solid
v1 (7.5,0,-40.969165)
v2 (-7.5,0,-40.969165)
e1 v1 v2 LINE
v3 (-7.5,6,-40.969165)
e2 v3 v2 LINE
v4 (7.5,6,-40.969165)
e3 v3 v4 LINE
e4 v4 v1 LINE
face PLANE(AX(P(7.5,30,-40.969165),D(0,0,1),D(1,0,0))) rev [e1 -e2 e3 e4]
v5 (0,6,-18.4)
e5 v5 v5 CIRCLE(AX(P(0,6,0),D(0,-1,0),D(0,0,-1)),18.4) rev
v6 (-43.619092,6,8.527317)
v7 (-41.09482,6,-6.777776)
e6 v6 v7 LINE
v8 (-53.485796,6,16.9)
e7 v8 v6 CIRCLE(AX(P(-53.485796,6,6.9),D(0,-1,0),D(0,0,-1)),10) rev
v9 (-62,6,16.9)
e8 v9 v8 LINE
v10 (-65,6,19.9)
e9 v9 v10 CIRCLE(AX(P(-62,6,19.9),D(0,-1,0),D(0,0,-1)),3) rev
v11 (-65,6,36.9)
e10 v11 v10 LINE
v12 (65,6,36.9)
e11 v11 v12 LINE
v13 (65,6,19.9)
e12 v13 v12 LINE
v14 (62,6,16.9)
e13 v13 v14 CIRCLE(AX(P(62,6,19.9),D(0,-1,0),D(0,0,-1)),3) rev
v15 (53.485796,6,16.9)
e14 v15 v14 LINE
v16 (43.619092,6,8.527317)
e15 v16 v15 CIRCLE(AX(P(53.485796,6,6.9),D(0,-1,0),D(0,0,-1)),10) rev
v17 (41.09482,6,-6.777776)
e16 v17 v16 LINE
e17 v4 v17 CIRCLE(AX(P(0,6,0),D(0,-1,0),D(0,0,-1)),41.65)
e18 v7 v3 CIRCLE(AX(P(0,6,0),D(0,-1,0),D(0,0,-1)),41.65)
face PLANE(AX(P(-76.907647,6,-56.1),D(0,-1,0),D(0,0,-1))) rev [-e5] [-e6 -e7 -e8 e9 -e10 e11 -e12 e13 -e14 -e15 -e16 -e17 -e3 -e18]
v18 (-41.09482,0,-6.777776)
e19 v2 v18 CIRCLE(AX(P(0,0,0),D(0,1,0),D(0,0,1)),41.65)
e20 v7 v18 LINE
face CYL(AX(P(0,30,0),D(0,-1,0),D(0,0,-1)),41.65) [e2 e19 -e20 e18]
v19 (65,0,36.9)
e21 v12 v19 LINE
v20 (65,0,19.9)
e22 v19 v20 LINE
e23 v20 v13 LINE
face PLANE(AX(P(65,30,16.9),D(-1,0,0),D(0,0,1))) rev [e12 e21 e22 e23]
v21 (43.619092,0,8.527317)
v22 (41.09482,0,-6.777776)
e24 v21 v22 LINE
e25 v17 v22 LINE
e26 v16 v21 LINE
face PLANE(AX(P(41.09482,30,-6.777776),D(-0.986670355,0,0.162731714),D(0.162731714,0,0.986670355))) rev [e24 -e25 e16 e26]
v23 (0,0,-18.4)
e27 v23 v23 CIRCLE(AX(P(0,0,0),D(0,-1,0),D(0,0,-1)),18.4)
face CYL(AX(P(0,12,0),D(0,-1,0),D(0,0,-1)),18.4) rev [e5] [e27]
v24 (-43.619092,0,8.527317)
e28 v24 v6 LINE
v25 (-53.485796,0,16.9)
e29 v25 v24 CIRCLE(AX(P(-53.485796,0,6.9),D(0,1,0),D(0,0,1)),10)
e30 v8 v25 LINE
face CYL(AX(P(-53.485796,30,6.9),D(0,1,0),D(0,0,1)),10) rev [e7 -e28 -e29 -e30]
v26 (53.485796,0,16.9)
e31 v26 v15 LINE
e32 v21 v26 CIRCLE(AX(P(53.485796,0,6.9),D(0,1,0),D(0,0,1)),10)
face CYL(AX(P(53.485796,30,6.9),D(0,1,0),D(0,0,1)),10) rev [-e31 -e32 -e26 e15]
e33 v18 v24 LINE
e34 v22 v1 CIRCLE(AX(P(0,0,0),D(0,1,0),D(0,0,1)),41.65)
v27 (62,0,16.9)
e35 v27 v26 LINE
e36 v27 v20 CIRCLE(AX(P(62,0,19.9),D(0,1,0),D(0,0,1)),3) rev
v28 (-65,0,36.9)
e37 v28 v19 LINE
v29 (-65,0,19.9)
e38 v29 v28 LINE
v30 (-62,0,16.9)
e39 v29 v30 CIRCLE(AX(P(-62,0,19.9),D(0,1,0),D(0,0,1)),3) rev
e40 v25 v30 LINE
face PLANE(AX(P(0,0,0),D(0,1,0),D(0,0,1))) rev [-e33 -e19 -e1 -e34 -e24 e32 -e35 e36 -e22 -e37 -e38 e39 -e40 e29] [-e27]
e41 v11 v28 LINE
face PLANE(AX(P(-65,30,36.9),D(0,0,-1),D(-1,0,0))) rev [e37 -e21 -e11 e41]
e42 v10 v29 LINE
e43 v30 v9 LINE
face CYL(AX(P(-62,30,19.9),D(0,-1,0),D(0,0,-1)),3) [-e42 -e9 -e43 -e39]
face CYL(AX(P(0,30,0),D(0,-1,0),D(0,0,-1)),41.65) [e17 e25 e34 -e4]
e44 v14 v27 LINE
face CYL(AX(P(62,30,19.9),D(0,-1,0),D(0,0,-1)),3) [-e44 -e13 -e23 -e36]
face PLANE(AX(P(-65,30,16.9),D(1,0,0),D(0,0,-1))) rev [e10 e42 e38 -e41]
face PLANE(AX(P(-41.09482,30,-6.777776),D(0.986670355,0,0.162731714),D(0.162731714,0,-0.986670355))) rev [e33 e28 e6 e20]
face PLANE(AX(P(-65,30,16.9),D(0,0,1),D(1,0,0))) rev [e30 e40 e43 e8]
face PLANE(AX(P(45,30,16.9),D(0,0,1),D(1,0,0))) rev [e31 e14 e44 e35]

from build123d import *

# Parameters (mm, degrees)
SKETCH1_R           = 20.9
BOSS_EXTRUDE1_DEPTH = 30
SKETCH2_R           = 1
CUT_EXTRUDE1_DEPTH  = 3
SKETCH3_R           = 1
CUT_EXTRUDE2_DEPTH  = 3
SKETCH6_R           = 22.9
SKETCH6_R_2         = 18.4
BOSS_EXTRUDE2_DEPTH = 12
FILLET1_R           = 10
CHAMFER1_SIZE       = 2
SKETCH4_W           = 15
SKETCH4_H           = 3.988700157
CUT_EXTRUDE3_DEPTH  = 83.82344173
SKETCH8_R           = 1
CUT_EXTRUDE4_DEPTH  = 2
FILLET2_R           = 3
FILLET3_R           = 3
SKETCH9_W           = 164.009429166
SKETCH9_H           = 28.275732928
CUT_EXTRUDE5_DEPTH  = 93


with BuildPart() as part:
    # Sketch1 → Boss-Extrude1 (new body)
    with BuildSketch(Plane(origin=(0, 0, 0), x_dir=(1, 0, 0), z_dir=(0, 1, 0))):
        with BuildLine():
            Line((-41.094820281, 6.777775896), (-45, -16.9))
            Line((-45, -16.9), (-65, -16.9))
            Line((-65, -16.9), (-65, -36.9))
            Line((-65, -36.9), (65, -36.9))
            Line((65, -36.9), (65, -16.9))
            Line((65, -16.9), (45, -16.9))
            Line((45, -16.9), (41.094820281, 6.777775896))
            ThreePointArc((41.094820281, 6.777775896), (0, 41.65), (-41.094820281, 6.777775896))
        make_face()
        with Locations(Location((0, 0, 0), (0, 0, 270))):
            Circle(SKETCH1_R, mode=Mode.SUBTRACT)
    extrude(amount=BOSS_EXTRUDE1_DEPTH)

    # Sketch2 → Cut-Extrude1 (cut)
    with BuildSketch(Plane(origin=(0, 0, 16.9), x_dir=(-1, 0, 0), z_dir=(0, 0, -1))):
        with Locations((-55, 15)):
            Circle(SKETCH2_R)
    extrude(amount=-CUT_EXTRUDE1_DEPTH, mode=Mode.SUBTRACT)

    # Sketch3 → Cut-Extrude2 (cut)
    with BuildSketch(Plane(origin=(0, 0, 16.9), x_dir=(-1, 0, 0), z_dir=(0, 0, -1))):
        with Locations((55, 15)):
            Circle(SKETCH3_R)
    extrude(amount=-CUT_EXTRUDE2_DEPTH, mode=Mode.SUBTRACT)

    # Sketch6 → Boss-Extrude2 (add)
    with BuildSketch(Plane.XZ):
        Circle(SKETCH6_R)
        with Locations(Location((0, 0, 0), (0, 0, 270))):
            Circle(SKETCH6_R_2, mode=Mode.SUBTRACT)
    extrude(amount=-BOSS_EXTRUDE2_DEPTH)

    # Fillet1
    fillet1_edges = [part.edges().sort_by_distance(p)[0] for p in [
        (-45, 15, 16.9),
        (45, 15, 16.9),
    ]]
    fillet(fillet1_edges, radius=FILLET1_R)

    # Chamfer1
    chamfer1_edges = [part.edges().sort_by_distance(p)[0] for p in [
        (0, 30, -20.9),
    ]]
    chamfer(chamfer1_edges, length=CHAMFER1_SIZE)

    # Sketch4 → Cut-Extrude3 (cut, through all)
    with BuildSketch(Plane.XZ):
        with Locations((0, -42.963515313)):
            Rectangle(SKETCH4_W, SKETCH4_H)
    extrude(amount=-CUT_EXTRUDE3_DEPTH, mode=Mode.SUBTRACT)

    # Sketch8 → Cut-Extrude4 (cut)
    with BuildSketch(Plane(origin=(0, 0, -40.969165234), x_dir=(-1, 0, 0), z_dir=(0, 0, -1))):
        with Locations((0, 22)):
            Circle(SKETCH8_R)
    extrude(amount=-CUT_EXTRUDE4_DEPTH, mode=Mode.SUBTRACT)

    # Fillet2
    # the kernel refuses this fillet: 3 mm, written as the material it takes off along each edge
    with BuildSketch(Plane(origin=(83, 30, 16.9), x_dir=(0, 0, 1), z_dir=(-1, 0, 0)), Plane(origin=(-53.485795501, 30, 16.9), x_dir=(0, 0, 1), z_dir=(-1, 0, 0))) as fillet2_piece_1:
        with BuildLine():
            CenterArc((FILLET2_R, -FILLET2_R), FILLET2_R, 90, 90)
            Line((0, -FILLET2_R), (-FILLET2_R * 0.02, -FILLET2_R))
            Line((-FILLET2_R * 0.02, -FILLET2_R), (-FILLET2_R * 0.02, FILLET2_R * 0.02))
            Line((-FILLET2_R * 0.02, FILLET2_R * 0.02), (FILLET2_R, FILLET2_R * 0.02))
            Line((FILLET2_R, FILLET2_R * 0.02), (FILLET2_R, 0))
        make_face()
    extrude(amount=29.514204499, mode=Mode.SUBTRACT)
    with BuildSketch(Plane(origin=(53.485795501, 30, 6.9), x_dir=(-0.9866703548806417, 0, 0.1627317141792235), z_dir=(-0.1627317141792235, 0, -0.9866703548806417))) as fillet2_piece_2:
        with BuildLine():
            CenterArc((10 + FILLET2_R, -FILLET2_R), FILLET2_R, 90, 90)
            Line((10, -FILLET2_R), (10 - FILLET2_R * 0.02, -FILLET2_R))
            Line((10 - FILLET2_R * 0.02, -FILLET2_R), (10 - FILLET2_R * 0.02, FILLET2_R * 0.02))
            Line((10 - FILLET2_R * 0.02, FILLET2_R * 0.02), (10 + FILLET2_R, FILLET2_R * 0.02))
            Line((10 + FILLET2_R, FILLET2_R * 0.02), (10 + FILLET2_R, 0))
        make_face()
    revolve(axis=Axis((53.485795501, 30, 6.9), (0, 1, 0)), revolution_arc=80.6345096, mode=Mode.SUBTRACT)
    with BuildSketch(Plane(origin=(43.619091952, 30, 8.527317142), x_dir=(-0.9866703548806418, 0, 0.16273171417922358), z_dir=(-0.16273171417922358, 0, -0.9866703548806418)), Plane(origin=(-41.094820281, 30, -6.777775896), x_dir=(0.9866703548806418, 0, 0.16273171417922358), z_dir=(-0.16273171417922358, 0, 0.9866703548806418))) as fillet2_piece_3:
        with BuildLine():
            CenterArc((FILLET2_R, -FILLET2_R), FILLET2_R, 90, 90)
            Line((0, -FILLET2_R), (-FILLET2_R * 0.02, -FILLET2_R))
            Line((-FILLET2_R * 0.02, -FILLET2_R), (-FILLET2_R * 0.02, FILLET2_R * 0.02))
            Line((-FILLET2_R * 0.02, FILLET2_R * 0.02), (FILLET2_R, FILLET2_R * 0.02))
            Line((FILLET2_R, FILLET2_R * 0.02), (FILLET2_R, 0))
        make_face()
    extrude(amount=15.511860635, mode=Mode.SUBTRACT)
    with BuildSketch(Plane(origin=(-53.485795501, 30, 6.9), x_dir=(0.9866703548806417, 0, 0.1627317141792235), z_dir=(0.1627317141792235, 0, -0.9866703548806417))) as fillet2_piece_4:
        with BuildLine():
            CenterArc((10 + FILLET2_R, FILLET2_R), FILLET2_R, 180, 90)
            Line((10, FILLET2_R), (10 - FILLET2_R * 0.02, FILLET2_R))
            Line((10 - FILLET2_R * 0.02, FILLET2_R), (10 - FILLET2_R * 0.02, -FILLET2_R * 0.02))
            Line((10 - FILLET2_R * 0.02, -FILLET2_R * 0.02), (10 + FILLET2_R, -FILLET2_R * 0.02))
            Line((10 + FILLET2_R, -FILLET2_R * 0.02), (10 + FILLET2_R, 0))
        make_face()
    revolve(axis=Axis((-53.485795501, 30, 6.9), (0, -1, 0)), revolution_arc=80.6345096, mode=Mode.SUBTRACT)
    with BuildSketch(Plane(origin=(0, 30, 0), x_dir=(0.24858486581871286, 0, -0.9686101199584343), z_dir=(0.9686101199584343, 0, 0.24858486581871286))) as fillet2_piece_5:
        with BuildLine():
            CenterArc((41.65 - FILLET2_R, -FILLET2_R), FILLET2_R, 0, 90)
            Line((41.65, -FILLET2_R), (41.65 + FILLET2_R * 0.02, -FILLET2_R))
            Line((41.65 + FILLET2_R * 0.02, -FILLET2_R), (41.65 + FILLET2_R * 0.02, FILLET2_R * 0.02))
            Line((41.65 + FILLET2_R * 0.02, FILLET2_R * 0.02), (41.65 - FILLET2_R, FILLET2_R * 0.02))
            Line((41.65 - FILLET2_R, FILLET2_R * 0.02), (41.65 - FILLET2_R, 0))
        make_face()
    revolve(axis=Axis((0, 30, 0), (0, 1, 0)), revolution_arc=95.028297231, mode=Mode.SUBTRACT)
    with BuildSketch(Plane(origin=(0, 30, 0), x_dir=(0.9866703548806417, 0, -0.16273171417922386), z_dir=(0.16273171417922386, 0, 0.9866703548806417))) as fillet2_piece_6:
        with BuildLine():
            CenterArc((41.65 - FILLET2_R, -FILLET2_R), FILLET2_R, 0, 90)
            Line((41.65, -FILLET2_R), (41.65 + FILLET2_R * 0.02, -FILLET2_R))
            Line((41.65 + FILLET2_R * 0.02, -FILLET2_R), (41.65 + FILLET2_R * 0.02, FILLET2_R * 0.02))
            Line((41.65 + FILLET2_R * 0.02, FILLET2_R * 0.02), (41.65 - FILLET2_R, FILLET2_R * 0.02))
            Line((41.65 - FILLET2_R, FILLET2_R * 0.02), (41.65 - FILLET2_R, 0))
        make_face()
    revolve(axis=Axis((0, 30, 0), (0, 1, 0)), revolution_arc=95.028297231, mode=Mode.SUBTRACT)

    # Fillet3
    fillet3_edges = [part.edges().sort_by_distance(p)[0] for p in [
        (65, 30, 28.4),
        (-65, 30, 28.4),
        (65, 13.5, 16.9),
        (65, 29.121320344, 17.778679656),
        (-65, 13.5, 16.9),
        (-65, 29.121320344, 17.778679656),
    ]]
    fillet(fillet3_edges, radius=FILLET3_R)

    # Sketch9 → Cut-Extrude5 (cut)
    with BuildSketch(Plane.XY.offset(36.9)):
        with Locations((5.097067232, 20.137866464)):
            Rectangle(SKETCH9_W, SKETCH9_H)
    extrude(amount=-CUT_EXTRUDE5_DEPTH, mode=Mode.SUBTRACT)


solid = part.part
